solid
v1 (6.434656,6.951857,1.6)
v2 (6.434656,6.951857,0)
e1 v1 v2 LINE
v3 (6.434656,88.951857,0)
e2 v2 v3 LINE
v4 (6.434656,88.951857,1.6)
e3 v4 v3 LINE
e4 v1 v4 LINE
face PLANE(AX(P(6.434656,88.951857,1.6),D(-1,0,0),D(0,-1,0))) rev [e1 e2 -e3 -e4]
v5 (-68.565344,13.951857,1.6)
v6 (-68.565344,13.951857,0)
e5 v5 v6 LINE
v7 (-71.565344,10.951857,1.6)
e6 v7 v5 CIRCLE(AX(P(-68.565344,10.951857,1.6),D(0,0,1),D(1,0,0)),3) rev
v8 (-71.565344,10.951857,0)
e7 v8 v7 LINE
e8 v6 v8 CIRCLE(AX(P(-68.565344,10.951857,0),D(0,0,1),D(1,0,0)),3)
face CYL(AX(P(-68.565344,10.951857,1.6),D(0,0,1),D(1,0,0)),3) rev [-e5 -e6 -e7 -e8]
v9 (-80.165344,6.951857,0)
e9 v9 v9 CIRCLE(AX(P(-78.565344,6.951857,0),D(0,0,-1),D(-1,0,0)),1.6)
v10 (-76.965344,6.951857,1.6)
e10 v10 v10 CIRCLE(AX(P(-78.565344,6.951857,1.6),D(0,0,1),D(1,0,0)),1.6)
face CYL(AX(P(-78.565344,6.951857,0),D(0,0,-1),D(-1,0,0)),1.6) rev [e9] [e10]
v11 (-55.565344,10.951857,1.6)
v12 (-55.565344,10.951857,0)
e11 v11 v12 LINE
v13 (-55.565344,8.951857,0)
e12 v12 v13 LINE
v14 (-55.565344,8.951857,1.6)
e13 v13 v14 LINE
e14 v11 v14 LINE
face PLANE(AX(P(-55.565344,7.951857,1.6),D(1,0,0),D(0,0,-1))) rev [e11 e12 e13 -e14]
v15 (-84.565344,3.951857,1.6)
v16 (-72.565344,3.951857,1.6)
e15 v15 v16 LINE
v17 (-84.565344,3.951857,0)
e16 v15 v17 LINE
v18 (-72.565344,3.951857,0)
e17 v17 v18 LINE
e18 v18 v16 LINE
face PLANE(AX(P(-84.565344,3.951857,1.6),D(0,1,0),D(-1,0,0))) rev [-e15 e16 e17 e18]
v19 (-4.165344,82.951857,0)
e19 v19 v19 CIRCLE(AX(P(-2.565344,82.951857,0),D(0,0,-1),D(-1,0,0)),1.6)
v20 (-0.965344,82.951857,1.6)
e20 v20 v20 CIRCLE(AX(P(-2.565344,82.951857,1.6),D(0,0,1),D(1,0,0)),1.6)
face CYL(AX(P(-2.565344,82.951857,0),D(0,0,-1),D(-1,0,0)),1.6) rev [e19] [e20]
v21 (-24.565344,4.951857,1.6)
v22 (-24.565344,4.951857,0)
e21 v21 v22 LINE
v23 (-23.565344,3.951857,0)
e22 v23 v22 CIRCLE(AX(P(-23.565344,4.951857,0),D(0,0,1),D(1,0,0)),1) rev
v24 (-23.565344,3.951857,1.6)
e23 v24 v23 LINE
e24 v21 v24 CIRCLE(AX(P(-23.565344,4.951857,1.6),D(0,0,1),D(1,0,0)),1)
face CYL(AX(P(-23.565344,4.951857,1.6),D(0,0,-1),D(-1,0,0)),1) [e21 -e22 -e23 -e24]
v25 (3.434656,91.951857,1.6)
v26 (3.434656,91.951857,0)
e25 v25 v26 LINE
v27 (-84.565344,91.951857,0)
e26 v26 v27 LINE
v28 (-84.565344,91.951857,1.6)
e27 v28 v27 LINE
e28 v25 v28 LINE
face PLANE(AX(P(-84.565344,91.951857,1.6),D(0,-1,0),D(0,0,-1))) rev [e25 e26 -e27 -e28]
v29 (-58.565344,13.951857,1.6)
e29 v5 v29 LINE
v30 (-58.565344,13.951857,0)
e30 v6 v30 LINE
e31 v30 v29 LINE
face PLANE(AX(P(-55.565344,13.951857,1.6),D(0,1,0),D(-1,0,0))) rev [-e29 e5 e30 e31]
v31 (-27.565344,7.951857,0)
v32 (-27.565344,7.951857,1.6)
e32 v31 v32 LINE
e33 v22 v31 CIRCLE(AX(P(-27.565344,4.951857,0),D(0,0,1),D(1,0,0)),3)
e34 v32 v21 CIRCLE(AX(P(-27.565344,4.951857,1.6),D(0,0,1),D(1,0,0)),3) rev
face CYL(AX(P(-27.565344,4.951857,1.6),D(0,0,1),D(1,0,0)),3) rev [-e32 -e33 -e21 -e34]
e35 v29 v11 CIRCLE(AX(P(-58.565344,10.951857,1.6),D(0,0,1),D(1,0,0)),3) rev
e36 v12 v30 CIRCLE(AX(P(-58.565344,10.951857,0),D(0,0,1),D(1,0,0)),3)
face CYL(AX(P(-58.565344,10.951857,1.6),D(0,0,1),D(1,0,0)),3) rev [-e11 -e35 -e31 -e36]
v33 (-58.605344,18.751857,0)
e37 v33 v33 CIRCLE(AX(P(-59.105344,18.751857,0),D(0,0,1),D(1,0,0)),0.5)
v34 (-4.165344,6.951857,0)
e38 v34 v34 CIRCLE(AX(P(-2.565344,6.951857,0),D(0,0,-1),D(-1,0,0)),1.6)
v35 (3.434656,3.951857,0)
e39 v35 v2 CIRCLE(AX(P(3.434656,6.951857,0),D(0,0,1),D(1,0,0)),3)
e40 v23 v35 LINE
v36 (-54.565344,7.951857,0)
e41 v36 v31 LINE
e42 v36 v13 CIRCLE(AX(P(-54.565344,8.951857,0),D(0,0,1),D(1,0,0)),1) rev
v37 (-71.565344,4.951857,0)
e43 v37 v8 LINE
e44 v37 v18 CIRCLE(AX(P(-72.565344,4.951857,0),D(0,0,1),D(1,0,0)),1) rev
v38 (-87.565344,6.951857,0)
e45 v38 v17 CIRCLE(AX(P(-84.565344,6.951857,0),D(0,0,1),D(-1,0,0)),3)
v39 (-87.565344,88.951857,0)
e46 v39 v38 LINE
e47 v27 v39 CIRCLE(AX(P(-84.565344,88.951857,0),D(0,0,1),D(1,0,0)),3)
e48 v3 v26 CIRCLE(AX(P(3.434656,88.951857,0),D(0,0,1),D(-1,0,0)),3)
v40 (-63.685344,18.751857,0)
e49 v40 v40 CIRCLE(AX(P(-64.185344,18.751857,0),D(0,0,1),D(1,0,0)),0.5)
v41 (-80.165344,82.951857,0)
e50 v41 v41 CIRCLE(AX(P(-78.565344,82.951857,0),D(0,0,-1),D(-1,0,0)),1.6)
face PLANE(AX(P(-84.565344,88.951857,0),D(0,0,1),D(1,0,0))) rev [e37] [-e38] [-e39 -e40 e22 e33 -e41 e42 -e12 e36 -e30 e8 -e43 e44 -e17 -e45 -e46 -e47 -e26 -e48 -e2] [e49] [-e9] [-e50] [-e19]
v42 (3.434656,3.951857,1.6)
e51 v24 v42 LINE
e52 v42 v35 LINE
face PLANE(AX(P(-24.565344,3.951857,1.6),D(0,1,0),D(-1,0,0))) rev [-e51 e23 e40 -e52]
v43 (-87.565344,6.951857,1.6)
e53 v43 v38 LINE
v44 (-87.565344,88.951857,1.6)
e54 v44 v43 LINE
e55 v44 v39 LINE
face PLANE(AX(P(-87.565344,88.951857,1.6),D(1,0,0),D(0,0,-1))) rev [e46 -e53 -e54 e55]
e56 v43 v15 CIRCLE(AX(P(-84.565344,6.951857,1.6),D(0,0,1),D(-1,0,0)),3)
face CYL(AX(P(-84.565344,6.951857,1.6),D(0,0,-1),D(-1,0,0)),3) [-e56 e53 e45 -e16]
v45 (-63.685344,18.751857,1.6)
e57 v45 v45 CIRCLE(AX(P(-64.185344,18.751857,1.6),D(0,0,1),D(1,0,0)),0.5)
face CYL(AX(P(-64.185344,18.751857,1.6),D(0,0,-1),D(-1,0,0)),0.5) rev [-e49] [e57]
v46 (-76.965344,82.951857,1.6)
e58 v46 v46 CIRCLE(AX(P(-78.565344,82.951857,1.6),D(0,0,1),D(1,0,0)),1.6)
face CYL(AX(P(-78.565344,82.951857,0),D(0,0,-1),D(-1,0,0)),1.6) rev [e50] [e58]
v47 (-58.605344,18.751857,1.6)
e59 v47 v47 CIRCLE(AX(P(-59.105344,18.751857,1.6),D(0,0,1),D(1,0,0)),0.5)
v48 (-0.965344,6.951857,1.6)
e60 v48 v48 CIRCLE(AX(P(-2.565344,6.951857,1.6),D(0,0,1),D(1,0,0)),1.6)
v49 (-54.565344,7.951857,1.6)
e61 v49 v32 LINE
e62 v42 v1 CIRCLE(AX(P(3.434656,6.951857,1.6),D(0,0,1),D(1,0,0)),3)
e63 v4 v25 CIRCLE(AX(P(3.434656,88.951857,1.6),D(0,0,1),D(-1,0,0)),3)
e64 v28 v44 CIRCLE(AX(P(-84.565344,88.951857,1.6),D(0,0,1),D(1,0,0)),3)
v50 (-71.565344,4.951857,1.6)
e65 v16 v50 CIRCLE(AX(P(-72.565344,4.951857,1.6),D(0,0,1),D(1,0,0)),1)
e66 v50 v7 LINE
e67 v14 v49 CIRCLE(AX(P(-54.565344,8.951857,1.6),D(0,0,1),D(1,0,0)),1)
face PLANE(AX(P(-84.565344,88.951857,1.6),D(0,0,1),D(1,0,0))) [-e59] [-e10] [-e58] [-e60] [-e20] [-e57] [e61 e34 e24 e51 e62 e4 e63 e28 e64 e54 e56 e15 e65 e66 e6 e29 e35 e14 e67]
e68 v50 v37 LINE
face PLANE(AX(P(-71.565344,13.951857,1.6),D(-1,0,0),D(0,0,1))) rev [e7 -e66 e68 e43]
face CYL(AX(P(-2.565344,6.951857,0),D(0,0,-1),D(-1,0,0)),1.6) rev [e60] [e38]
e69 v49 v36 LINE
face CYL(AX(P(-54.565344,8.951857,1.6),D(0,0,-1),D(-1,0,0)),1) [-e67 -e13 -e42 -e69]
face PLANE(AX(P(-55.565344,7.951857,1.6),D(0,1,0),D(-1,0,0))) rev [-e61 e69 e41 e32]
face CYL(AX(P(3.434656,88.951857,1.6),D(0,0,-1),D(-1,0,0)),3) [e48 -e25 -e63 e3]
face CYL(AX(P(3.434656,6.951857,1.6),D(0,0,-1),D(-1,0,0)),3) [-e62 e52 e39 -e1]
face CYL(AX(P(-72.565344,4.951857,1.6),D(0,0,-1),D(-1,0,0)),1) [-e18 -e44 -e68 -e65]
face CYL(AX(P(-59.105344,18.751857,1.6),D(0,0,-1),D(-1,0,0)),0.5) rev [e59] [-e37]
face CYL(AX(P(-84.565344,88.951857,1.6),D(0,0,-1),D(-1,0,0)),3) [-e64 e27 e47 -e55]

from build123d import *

# Parameters (mm, degrees)
SKETCH1_R                  = 0.5
BOSS_EXTRUDE1_DEPTH        = 1.6
F_3_2_3_2_DIAMETER_HOLE3_D = 3.2
FILLET1_R                  = 3
FILLET2_R                  = 1


with BuildPart() as part:
    # Sketch1 → Boss-Extrude1 (new body)
    with BuildSketch(Plane.XY):
        with BuildLine():
            Line((-55.56534388, 7.95185693), (-55.56534388, 13.95185693))
            Line((-55.56534388, 13.95185693), (-71.56534388, 13.95185693))
            Line((-71.56534388, 13.95185693), (-71.56534388, 3.95185693))
            Line((-71.56534388, 3.95185693), (-84.56534388, 3.95185693))
            ThreePointArc((-84.56534388, 3.95185693), (-86.686664224, 4.830536587), (-87.56534388, 6.95185693))
            Line((-87.56534388, 6.95185693), (-87.56534388, 88.95185693))
            ThreePointArc((-87.56534388, 88.95185693), (-86.686664224, 91.073177274), (-84.56534388, 91.95185693))
            Line((-84.56534388, 91.95185693), (3.43465612, 91.95185693))
            ThreePointArc((3.43465612, 91.95185693), (5.555976464, 91.073177274), (6.43465612, 88.95185693))
            Line((6.43465612, 88.95185693), (6.43465612, 6.95185693))
            ThreePointArc((6.43465612, 6.95185693), (5.555976464, 4.830536587), (3.43465612, 3.95185693))
            Line((3.43465612, 3.95185693), (-24.56534388, 3.95185693))
            Line((-24.56534388, 3.95185693), (-24.56534388, 7.95185693))
            Line((-24.56534388, 7.95185693), (-55.56534388, 7.95185693))
        make_face()
        with Locations((-59.10534388, 18.75185693)):
            Circle(SKETCH1_R, mode=Mode.SUBTRACT)
        with Locations((-64.18534388, 18.75185693)):
            Circle(SKETCH1_R, mode=Mode.SUBTRACT)
    extrude(amount=BOSS_EXTRUDE1_DEPTH)

    # Ø3.2 (3.2) Diameter Hole3 (through all)
    with Locations(Plane(origin=(0, 0, 0), x_dir=(-1, 0, 0), z_dir=(0, 0, -1))):
        with Locations((78.56534388, 6.95185693), (78.56534388, 82.95185693), (2.56534388, 82.95185693), (2.56534388, 6.95185693)):
            Hole(F_3_2_3_2_DIAMETER_HOLE3_D / 2)

    # Fillet1
    fillet1_edges = [part.edges().sort_by_distance(p)[0] for p in [
        (-24.56534388, 7.95185693, 0.8),
        (-55.56534388, 13.95185693, 0.8),
        (-71.56534388, 13.95185693, 0.8),
    ]]
    fillet(fillet1_edges, radius=FILLET1_R)

    # Fillet2
    fillet2_edges = [part.edges().sort_by_distance(p)[0] for p in [
        (-24.56534388, 3.95185693, 0.8),
        (-71.56534388, 3.95185693, 0.8),
        (-55.56534388, 7.95185693, 0.8),
    ]]
    fillet(fillet2_edges, radius=FILLET2_R - 0.0001)  # a hair under: the kernel refuses the full size


solid = part.part
